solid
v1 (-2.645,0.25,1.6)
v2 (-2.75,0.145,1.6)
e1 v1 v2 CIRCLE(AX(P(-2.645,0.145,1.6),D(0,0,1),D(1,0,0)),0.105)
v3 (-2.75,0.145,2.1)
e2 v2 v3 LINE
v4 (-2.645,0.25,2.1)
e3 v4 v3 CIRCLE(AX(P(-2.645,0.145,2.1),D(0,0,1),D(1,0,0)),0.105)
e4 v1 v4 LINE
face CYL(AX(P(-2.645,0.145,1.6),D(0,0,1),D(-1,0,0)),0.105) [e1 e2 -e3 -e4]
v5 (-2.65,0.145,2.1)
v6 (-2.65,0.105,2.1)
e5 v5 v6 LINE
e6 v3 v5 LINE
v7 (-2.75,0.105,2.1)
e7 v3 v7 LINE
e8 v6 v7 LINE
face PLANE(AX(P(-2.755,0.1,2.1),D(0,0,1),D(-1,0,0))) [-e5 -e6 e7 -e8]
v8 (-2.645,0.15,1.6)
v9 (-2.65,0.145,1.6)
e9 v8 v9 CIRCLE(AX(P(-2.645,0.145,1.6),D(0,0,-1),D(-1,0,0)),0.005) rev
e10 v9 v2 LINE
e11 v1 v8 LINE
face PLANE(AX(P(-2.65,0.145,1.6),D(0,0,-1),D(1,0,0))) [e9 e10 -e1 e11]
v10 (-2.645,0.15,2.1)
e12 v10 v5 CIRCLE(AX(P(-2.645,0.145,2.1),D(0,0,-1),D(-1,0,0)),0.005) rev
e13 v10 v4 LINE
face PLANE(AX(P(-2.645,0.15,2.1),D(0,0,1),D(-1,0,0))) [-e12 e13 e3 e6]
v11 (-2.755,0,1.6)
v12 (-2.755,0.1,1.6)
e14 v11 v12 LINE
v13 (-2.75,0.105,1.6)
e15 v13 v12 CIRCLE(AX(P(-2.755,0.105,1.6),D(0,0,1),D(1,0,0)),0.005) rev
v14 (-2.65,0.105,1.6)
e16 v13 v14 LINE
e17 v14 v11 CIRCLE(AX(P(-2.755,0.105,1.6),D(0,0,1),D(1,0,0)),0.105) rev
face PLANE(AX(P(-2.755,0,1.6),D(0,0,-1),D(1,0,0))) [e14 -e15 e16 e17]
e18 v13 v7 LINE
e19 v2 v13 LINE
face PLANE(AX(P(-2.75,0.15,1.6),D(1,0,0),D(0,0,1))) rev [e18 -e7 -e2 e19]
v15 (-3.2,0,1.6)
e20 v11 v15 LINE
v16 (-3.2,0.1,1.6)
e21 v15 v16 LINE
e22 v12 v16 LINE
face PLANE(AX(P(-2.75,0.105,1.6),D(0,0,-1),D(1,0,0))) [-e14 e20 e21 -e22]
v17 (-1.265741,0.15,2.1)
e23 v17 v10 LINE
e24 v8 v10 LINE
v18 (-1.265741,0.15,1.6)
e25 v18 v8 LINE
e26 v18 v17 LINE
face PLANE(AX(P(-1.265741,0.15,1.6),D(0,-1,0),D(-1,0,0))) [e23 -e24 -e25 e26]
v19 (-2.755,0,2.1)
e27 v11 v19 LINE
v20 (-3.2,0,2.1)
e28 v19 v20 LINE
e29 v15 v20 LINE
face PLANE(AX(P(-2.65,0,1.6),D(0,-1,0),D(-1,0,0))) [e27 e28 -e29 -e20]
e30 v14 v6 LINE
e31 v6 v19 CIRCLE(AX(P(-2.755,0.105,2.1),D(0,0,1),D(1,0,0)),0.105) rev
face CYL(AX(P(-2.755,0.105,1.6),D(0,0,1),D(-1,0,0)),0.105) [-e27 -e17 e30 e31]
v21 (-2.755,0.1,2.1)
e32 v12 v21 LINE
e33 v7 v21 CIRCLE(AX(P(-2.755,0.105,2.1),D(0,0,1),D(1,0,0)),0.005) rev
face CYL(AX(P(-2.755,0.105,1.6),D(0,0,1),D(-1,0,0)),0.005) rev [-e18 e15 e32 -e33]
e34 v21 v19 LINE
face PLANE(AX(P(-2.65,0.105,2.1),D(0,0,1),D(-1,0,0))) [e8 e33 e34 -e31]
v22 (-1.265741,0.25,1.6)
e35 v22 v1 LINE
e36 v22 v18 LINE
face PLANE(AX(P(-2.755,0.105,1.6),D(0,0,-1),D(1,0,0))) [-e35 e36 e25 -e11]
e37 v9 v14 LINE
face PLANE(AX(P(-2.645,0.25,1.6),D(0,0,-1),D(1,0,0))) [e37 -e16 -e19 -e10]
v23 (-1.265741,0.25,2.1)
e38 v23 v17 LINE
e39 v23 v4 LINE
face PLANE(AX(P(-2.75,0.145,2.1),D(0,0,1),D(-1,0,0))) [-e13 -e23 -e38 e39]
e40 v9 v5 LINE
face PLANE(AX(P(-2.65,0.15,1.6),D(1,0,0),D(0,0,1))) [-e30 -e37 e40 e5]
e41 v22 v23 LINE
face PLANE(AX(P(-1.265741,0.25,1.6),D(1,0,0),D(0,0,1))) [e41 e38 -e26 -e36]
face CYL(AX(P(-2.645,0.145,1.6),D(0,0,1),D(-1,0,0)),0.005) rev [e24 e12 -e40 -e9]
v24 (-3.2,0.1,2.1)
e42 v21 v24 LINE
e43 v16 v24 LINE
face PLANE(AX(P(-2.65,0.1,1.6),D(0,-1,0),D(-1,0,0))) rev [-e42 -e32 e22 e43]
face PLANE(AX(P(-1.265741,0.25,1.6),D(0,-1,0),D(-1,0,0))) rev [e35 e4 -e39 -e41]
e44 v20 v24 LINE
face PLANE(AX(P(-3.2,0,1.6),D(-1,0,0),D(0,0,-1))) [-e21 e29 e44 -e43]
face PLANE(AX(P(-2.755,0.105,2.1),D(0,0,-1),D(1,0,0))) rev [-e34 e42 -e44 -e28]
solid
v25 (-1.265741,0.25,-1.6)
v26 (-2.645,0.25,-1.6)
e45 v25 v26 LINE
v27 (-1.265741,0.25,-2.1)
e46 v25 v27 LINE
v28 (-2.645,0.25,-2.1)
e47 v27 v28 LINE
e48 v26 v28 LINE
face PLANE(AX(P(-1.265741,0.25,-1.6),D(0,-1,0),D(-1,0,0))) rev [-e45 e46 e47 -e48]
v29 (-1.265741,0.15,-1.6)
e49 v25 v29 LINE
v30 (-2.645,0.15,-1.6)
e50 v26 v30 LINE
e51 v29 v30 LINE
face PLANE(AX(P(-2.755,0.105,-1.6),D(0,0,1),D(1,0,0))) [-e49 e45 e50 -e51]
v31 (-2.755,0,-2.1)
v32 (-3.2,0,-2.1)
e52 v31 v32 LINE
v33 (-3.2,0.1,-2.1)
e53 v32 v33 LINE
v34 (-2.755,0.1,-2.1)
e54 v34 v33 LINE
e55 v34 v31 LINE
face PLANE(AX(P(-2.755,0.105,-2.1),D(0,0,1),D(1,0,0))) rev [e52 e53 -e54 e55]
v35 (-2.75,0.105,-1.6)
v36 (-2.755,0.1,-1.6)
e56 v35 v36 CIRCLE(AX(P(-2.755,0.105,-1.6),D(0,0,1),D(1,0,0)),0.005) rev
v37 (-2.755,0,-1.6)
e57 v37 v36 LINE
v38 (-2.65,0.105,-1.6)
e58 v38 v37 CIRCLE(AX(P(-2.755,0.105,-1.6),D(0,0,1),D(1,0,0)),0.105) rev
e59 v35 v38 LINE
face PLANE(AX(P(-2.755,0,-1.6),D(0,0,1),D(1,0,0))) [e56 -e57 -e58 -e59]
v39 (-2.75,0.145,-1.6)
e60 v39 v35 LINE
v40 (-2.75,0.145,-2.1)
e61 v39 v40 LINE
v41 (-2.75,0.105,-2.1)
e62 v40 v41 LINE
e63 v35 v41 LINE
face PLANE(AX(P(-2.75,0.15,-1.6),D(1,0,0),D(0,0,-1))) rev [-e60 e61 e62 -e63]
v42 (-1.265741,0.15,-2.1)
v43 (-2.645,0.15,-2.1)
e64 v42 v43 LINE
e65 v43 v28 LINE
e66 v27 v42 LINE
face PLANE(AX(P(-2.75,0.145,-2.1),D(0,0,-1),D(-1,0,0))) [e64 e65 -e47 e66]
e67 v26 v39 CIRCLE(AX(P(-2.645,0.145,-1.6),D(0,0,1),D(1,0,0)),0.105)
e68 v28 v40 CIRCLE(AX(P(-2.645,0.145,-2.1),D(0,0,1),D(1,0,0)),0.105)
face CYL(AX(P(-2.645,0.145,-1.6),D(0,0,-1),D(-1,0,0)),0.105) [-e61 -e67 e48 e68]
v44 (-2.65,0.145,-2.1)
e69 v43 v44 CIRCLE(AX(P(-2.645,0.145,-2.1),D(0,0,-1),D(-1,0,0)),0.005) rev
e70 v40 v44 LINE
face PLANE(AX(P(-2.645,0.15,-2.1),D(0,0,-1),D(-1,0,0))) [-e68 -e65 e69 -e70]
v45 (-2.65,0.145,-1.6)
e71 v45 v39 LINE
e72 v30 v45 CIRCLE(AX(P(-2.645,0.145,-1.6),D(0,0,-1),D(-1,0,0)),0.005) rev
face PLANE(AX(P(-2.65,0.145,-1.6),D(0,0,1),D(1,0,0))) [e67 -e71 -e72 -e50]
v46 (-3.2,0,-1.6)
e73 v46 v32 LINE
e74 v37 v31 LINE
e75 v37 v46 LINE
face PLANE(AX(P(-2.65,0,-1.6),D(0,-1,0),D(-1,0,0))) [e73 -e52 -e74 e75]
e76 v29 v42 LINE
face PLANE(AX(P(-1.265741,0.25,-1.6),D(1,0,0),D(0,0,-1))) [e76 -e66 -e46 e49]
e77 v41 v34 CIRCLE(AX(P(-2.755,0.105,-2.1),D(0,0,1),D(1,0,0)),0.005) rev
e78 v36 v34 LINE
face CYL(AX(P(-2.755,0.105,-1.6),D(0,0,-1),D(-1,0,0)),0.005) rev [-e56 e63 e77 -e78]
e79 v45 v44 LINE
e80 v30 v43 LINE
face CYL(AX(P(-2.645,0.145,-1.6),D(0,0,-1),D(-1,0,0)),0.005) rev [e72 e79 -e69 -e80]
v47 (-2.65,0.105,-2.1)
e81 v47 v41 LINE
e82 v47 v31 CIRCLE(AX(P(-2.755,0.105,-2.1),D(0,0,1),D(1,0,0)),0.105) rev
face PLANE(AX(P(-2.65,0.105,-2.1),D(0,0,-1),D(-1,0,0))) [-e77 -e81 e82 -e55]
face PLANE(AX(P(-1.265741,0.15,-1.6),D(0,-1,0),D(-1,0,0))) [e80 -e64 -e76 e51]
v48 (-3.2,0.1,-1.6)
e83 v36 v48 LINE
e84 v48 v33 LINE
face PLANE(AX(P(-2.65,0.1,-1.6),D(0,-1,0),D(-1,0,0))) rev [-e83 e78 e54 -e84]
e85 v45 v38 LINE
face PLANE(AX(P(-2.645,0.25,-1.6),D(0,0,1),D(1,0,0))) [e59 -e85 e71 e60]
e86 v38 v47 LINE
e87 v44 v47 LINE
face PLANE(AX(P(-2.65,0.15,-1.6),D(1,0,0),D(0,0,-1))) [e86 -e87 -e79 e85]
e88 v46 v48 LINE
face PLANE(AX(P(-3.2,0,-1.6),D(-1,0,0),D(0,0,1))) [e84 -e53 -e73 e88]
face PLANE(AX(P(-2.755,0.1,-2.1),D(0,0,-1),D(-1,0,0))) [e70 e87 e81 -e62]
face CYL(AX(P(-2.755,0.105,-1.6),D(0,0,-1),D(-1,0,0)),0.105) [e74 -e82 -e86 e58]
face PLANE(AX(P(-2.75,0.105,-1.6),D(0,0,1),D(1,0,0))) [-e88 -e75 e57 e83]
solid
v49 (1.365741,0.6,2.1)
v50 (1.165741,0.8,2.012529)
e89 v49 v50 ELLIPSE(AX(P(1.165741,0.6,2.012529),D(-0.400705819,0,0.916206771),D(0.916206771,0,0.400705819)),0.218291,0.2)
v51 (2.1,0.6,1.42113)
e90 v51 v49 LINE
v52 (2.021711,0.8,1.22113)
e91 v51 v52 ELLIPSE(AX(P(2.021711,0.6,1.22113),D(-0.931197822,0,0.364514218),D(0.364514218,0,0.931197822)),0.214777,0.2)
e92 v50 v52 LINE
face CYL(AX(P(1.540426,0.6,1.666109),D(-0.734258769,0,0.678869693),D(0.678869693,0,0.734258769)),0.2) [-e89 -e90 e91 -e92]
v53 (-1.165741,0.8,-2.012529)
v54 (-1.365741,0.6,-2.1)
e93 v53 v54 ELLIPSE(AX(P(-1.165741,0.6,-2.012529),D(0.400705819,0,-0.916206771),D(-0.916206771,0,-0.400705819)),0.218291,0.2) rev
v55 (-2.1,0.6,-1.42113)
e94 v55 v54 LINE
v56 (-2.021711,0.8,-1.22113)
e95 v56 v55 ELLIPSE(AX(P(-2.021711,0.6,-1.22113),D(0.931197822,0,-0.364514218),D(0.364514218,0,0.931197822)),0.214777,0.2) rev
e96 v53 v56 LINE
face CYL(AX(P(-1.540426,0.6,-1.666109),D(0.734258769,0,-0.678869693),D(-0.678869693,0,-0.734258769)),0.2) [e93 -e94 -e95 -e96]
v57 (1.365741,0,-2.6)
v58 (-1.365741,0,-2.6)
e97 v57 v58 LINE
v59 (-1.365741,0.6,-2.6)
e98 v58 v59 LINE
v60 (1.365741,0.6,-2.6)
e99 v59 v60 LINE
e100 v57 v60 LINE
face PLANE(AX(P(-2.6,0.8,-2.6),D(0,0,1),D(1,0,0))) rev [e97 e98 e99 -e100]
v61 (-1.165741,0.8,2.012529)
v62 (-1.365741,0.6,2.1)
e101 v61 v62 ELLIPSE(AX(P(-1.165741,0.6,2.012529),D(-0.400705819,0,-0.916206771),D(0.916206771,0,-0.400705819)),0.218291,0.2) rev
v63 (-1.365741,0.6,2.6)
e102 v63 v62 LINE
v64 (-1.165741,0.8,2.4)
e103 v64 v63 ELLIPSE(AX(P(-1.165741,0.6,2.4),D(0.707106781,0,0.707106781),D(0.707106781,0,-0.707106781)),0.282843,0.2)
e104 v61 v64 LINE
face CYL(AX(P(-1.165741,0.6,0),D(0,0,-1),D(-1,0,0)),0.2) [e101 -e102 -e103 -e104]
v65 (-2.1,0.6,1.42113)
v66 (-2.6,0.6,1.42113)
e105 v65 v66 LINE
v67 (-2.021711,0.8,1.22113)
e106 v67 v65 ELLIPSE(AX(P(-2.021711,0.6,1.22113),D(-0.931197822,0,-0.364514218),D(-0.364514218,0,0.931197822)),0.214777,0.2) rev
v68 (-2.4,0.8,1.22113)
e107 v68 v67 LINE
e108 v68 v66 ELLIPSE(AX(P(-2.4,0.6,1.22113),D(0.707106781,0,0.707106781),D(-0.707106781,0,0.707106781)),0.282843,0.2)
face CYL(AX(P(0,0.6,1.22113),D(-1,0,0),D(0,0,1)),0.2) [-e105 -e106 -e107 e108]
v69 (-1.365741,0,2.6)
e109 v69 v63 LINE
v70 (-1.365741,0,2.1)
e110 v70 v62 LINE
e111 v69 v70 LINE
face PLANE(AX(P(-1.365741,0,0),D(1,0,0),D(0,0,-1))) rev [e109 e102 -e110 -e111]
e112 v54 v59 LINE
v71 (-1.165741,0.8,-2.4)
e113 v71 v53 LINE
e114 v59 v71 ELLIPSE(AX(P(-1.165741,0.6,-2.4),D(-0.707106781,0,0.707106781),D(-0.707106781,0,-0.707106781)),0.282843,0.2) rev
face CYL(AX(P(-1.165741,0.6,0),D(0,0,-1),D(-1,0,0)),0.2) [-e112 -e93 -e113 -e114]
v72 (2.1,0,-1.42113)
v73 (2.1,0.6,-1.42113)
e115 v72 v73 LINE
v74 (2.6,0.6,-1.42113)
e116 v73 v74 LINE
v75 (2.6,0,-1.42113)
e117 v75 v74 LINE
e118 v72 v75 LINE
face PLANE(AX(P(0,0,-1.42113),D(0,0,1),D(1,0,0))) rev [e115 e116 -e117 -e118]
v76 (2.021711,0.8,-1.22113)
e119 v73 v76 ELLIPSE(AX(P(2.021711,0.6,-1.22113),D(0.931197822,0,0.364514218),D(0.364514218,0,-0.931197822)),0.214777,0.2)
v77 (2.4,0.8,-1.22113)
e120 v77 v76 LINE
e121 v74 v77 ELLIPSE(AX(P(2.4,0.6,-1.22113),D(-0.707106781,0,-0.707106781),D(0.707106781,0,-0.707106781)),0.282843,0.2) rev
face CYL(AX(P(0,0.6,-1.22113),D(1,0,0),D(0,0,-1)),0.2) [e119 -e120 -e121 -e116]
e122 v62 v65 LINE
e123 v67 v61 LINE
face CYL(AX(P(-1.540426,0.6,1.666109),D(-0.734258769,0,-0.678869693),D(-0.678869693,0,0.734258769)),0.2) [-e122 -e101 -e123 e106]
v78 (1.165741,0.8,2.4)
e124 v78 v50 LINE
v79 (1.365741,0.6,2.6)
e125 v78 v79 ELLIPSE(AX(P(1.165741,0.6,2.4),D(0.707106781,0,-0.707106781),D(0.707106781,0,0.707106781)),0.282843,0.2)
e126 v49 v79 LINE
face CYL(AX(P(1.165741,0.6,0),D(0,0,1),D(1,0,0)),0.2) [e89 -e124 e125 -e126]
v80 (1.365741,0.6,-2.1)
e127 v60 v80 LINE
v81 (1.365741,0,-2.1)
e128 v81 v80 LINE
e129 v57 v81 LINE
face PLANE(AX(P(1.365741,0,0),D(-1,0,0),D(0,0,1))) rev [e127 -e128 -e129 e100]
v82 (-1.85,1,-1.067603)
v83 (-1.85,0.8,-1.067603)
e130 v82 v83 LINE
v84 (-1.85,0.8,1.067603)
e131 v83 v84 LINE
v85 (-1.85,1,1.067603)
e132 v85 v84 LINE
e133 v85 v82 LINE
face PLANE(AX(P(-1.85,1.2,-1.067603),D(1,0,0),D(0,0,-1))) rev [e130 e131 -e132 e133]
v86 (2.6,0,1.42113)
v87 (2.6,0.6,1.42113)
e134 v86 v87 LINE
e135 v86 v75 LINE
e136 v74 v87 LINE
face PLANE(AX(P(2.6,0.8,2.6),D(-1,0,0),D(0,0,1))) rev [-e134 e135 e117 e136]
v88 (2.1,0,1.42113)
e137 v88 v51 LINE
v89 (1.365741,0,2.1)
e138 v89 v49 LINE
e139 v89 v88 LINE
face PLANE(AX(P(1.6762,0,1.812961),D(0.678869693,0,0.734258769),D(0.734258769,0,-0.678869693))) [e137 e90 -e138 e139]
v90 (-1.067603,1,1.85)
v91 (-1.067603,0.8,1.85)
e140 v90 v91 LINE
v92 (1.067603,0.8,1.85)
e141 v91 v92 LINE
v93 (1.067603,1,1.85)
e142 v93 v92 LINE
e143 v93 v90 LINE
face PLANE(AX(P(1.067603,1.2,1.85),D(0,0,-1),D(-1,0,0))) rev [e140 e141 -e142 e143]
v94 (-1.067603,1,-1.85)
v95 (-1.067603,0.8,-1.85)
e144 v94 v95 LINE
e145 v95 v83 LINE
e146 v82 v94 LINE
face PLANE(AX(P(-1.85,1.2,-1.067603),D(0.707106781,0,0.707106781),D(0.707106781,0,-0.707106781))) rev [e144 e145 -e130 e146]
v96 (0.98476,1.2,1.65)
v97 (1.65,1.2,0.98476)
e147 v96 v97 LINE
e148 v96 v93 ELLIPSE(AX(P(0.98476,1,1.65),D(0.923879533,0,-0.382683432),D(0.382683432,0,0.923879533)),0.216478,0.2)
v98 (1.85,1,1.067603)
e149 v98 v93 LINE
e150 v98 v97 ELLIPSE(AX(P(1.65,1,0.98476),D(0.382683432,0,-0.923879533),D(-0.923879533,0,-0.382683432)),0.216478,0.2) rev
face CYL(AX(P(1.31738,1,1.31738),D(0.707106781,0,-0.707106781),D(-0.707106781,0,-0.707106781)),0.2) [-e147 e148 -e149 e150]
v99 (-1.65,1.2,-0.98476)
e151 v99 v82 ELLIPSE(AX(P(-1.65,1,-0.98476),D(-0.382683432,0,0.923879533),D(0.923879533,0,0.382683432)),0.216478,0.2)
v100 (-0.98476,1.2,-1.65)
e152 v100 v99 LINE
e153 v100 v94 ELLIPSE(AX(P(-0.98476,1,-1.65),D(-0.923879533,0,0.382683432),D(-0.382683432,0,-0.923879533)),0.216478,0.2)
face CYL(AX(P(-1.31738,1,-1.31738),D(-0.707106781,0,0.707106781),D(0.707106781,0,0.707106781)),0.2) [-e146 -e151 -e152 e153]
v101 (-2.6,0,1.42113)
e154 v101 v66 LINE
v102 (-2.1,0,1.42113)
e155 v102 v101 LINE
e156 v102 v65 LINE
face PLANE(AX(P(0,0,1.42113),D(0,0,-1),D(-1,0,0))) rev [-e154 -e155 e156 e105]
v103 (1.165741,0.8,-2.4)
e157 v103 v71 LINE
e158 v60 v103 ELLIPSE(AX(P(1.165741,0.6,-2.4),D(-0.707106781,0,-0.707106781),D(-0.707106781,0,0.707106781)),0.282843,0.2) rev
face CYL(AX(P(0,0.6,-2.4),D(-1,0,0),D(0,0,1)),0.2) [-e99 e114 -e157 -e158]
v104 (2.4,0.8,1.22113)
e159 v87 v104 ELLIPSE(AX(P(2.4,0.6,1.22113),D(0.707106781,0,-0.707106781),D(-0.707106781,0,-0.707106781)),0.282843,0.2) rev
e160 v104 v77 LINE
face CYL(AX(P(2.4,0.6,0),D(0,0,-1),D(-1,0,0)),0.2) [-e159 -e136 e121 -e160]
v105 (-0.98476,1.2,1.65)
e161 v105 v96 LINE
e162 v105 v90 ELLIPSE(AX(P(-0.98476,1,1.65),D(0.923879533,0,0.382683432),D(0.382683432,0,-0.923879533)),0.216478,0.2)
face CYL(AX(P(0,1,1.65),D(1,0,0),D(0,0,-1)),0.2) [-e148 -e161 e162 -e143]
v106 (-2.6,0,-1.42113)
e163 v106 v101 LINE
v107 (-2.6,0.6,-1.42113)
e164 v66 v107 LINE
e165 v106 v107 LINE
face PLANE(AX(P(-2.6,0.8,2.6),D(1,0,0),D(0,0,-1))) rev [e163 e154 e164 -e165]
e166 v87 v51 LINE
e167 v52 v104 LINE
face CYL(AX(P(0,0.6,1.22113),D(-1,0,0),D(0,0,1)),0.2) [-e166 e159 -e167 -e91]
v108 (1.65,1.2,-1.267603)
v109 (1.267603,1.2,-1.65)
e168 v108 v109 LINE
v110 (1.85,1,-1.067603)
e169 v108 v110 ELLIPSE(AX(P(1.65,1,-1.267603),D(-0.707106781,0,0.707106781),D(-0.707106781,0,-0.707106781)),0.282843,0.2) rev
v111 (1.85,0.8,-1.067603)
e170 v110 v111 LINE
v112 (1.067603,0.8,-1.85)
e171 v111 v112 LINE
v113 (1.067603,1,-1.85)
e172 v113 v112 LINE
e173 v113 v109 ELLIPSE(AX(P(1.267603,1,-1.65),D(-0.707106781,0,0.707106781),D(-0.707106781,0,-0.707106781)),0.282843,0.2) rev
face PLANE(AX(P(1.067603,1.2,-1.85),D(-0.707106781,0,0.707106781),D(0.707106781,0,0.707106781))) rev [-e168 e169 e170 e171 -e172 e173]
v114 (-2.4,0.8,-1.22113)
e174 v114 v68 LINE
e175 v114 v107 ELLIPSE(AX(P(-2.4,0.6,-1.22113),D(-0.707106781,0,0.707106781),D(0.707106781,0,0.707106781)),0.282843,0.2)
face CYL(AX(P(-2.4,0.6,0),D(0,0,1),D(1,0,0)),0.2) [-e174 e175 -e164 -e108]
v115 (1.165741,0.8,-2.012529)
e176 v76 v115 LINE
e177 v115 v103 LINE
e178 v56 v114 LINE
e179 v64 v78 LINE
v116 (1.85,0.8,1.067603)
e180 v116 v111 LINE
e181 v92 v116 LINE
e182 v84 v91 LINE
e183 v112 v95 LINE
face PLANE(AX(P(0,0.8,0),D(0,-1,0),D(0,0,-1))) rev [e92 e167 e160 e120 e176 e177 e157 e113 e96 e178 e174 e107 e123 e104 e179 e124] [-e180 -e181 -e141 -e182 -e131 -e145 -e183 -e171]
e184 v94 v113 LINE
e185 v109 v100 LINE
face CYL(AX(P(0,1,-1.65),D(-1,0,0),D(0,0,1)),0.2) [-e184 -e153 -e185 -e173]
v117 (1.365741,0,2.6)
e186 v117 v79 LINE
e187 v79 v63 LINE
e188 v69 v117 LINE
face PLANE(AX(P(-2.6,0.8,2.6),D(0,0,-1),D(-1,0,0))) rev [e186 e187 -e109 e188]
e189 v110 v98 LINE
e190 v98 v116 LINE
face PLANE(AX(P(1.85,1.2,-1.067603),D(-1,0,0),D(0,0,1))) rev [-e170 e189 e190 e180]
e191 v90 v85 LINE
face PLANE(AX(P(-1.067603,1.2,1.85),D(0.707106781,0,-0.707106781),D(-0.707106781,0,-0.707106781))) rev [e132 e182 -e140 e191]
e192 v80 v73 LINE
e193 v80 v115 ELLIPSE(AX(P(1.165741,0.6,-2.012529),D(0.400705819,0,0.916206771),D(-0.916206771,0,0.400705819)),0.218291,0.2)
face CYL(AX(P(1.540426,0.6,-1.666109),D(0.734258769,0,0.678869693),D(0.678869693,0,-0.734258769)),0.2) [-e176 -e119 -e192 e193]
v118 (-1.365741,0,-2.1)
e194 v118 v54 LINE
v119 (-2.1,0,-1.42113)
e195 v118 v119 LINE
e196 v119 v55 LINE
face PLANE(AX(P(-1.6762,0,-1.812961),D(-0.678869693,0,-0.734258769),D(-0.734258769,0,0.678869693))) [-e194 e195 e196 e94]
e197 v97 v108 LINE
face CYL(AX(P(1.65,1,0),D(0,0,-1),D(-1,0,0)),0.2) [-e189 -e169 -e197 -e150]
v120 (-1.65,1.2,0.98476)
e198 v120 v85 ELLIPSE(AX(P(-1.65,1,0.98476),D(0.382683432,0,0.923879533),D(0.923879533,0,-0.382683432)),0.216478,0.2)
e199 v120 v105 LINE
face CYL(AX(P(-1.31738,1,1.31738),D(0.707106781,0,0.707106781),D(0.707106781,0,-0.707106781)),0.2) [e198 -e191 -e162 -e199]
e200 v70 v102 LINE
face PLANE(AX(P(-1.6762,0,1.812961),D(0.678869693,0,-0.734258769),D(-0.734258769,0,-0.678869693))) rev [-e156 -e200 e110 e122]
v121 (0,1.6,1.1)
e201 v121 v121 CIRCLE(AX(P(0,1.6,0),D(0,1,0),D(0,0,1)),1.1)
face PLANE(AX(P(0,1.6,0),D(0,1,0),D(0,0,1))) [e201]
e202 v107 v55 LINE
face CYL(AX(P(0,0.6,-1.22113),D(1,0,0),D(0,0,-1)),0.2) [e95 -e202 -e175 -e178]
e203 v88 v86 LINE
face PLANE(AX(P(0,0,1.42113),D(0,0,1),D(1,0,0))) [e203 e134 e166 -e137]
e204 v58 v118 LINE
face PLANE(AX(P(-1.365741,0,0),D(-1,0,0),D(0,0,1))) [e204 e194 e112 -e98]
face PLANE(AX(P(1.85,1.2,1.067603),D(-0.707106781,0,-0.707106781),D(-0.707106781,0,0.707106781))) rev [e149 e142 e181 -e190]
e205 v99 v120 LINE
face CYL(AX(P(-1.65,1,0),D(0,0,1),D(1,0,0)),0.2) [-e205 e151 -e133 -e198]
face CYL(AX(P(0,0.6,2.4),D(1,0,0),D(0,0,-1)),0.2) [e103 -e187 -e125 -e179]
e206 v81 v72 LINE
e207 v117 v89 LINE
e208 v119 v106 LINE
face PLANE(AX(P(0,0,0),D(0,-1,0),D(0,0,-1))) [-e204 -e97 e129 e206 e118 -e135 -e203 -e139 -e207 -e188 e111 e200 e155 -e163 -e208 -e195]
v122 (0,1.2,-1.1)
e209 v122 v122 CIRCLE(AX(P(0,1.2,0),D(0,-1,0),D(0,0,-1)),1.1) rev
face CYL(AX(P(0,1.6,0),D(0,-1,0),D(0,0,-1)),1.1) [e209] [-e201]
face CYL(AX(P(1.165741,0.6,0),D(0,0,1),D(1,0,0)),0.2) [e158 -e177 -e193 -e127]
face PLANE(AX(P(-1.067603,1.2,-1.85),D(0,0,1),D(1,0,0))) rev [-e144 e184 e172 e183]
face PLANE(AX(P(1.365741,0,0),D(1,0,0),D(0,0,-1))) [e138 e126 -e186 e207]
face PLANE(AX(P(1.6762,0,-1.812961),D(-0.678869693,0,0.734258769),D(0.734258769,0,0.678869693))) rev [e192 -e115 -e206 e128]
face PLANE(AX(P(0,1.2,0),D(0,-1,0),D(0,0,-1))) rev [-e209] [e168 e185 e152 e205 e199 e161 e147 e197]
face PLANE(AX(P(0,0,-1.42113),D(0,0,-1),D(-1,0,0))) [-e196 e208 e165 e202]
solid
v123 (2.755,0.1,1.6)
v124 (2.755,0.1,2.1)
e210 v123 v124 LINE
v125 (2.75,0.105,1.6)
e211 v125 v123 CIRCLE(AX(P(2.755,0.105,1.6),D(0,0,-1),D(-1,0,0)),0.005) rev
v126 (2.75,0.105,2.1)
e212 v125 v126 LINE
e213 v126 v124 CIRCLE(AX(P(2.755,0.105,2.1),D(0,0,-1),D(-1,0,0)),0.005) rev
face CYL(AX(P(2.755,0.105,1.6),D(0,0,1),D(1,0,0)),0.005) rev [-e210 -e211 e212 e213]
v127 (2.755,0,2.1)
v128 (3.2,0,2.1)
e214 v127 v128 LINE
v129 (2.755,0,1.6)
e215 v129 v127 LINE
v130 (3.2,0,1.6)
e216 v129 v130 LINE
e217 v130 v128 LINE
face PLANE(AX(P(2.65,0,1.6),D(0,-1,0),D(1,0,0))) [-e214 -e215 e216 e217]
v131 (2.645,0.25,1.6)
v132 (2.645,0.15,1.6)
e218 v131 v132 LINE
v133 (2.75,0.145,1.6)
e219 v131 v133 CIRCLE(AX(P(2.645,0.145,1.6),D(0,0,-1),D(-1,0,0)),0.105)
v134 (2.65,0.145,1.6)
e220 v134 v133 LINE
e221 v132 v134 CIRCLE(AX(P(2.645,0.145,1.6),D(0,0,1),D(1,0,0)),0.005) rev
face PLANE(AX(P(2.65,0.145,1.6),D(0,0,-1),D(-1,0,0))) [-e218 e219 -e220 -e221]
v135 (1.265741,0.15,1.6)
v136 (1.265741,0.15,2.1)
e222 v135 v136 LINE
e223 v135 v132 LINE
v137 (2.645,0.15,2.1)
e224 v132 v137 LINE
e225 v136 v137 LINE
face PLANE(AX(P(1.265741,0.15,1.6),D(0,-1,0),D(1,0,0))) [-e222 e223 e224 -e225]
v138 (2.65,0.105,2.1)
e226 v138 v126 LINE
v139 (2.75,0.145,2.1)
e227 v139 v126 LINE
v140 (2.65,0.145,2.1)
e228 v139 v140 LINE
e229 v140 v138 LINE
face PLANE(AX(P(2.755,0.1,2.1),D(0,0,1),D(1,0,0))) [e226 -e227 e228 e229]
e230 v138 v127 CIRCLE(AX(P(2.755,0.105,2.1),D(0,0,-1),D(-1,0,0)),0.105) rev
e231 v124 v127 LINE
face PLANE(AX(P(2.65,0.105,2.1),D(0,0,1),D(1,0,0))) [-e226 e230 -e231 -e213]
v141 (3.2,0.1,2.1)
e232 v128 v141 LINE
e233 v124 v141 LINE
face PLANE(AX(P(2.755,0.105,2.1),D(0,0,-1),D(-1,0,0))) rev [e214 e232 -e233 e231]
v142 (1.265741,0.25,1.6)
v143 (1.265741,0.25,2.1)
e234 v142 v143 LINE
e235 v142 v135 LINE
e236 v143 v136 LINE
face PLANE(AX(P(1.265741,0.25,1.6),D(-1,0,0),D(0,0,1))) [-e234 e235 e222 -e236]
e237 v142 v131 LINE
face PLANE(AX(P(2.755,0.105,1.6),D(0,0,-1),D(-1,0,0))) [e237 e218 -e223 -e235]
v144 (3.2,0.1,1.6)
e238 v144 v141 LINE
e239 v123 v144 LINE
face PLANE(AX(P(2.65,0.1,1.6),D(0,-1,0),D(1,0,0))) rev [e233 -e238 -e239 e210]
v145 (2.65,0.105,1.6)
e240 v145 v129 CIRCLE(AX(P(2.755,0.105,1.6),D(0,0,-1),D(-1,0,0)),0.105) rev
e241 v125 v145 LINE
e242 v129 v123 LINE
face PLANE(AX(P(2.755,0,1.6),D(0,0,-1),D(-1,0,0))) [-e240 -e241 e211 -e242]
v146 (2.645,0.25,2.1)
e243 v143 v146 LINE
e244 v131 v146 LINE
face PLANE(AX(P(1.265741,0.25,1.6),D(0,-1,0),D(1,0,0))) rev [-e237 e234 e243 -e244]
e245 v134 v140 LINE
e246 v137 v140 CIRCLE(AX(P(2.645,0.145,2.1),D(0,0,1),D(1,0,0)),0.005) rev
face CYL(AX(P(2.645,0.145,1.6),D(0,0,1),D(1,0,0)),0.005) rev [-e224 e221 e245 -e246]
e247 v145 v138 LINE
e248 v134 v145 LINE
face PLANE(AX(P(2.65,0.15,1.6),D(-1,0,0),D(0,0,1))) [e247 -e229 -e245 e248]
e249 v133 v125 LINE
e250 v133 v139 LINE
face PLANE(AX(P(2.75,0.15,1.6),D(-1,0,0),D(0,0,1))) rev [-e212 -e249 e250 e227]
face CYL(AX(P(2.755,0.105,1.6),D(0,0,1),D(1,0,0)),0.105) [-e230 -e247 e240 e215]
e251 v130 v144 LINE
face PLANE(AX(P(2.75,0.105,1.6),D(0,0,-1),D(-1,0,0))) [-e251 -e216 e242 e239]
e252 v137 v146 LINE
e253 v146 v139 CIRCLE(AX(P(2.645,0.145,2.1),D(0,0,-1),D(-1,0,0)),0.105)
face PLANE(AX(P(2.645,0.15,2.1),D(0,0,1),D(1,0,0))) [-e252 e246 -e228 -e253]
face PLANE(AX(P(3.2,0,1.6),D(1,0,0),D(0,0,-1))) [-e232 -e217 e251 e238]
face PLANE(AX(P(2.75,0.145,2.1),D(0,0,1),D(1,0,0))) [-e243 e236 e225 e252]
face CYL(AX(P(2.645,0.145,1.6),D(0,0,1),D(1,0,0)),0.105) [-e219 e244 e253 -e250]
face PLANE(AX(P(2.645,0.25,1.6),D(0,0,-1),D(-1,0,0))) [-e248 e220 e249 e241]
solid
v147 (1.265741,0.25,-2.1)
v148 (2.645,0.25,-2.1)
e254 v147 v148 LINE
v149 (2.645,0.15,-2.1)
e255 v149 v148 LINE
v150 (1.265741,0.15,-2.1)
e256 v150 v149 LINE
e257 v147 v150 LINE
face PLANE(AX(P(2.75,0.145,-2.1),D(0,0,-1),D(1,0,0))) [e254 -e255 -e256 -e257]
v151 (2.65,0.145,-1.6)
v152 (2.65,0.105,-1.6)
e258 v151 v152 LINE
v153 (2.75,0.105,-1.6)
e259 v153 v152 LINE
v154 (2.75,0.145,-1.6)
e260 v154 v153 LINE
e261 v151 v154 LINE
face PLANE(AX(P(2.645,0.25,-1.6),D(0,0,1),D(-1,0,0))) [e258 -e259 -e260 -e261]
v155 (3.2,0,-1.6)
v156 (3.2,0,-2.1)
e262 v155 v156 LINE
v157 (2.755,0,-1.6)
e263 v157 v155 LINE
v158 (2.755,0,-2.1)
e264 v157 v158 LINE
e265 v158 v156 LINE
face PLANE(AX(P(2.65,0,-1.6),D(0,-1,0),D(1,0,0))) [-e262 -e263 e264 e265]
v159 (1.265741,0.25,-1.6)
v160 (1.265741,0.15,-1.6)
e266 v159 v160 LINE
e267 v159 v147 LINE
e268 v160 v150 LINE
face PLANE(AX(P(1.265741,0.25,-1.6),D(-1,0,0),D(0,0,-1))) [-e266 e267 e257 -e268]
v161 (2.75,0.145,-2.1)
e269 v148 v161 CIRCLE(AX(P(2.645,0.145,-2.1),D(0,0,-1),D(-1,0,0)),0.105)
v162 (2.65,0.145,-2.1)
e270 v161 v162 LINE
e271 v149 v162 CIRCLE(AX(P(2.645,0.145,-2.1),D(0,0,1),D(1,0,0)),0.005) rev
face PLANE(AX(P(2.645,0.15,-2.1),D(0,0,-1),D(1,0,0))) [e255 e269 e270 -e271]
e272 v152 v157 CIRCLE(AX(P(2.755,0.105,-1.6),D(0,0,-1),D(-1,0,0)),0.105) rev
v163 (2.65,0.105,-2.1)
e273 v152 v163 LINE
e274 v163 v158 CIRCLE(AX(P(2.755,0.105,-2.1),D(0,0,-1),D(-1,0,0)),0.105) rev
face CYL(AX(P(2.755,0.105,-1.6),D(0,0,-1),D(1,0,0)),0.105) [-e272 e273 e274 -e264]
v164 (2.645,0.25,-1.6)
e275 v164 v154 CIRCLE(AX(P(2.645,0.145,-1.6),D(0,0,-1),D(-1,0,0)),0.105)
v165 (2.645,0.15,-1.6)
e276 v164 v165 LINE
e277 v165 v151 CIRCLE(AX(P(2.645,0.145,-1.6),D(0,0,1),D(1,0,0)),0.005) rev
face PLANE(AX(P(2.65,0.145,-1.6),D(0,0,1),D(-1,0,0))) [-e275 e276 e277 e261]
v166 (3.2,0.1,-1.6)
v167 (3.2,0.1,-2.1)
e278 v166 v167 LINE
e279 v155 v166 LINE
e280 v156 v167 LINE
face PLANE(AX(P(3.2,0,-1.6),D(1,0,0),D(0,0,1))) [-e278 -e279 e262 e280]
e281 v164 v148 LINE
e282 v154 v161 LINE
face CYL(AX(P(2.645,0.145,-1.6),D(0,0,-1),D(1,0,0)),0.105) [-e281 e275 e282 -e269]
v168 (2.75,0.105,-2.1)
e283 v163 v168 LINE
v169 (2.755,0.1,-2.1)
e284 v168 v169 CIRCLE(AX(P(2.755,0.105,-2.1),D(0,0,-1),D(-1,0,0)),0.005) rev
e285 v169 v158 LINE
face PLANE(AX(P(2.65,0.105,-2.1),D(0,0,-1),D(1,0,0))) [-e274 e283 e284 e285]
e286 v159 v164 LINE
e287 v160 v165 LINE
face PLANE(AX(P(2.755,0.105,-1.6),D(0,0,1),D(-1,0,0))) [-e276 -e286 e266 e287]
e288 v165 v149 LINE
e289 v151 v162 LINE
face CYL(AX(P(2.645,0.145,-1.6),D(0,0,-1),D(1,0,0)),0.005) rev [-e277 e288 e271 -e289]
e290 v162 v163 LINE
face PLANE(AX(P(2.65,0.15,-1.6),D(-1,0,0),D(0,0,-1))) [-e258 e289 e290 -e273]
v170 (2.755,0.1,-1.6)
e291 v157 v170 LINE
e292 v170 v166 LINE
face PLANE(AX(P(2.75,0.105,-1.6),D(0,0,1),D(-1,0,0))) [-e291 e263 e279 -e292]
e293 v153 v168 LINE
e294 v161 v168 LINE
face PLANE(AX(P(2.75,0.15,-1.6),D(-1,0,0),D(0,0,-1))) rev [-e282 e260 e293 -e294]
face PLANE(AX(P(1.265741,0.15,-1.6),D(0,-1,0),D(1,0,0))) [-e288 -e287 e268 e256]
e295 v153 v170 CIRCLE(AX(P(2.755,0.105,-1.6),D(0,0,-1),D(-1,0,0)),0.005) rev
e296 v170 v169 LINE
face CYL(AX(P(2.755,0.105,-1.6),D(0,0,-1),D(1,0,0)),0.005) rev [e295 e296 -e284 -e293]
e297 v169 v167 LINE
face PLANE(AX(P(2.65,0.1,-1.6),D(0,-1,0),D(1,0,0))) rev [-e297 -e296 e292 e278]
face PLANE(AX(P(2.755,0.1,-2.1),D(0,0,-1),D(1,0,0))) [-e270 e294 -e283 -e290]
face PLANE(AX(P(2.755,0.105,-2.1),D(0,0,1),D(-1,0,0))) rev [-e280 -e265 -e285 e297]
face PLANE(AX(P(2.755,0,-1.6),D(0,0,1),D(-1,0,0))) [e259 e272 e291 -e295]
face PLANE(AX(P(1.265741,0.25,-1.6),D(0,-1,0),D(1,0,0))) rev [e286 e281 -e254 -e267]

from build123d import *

# Parameters (mm, degrees)
SKETCH1_W               = 5.2
SKETCH1_H               = 5.2
BOSS_EXTRUDE1_DEPTH     = 0.8
BOSS_EXTRUDE2_DEPTH     = 0.4
SKETCH3_R               = 1.1
BOSS_EXTRUDE3_DEPTH     = 0.4
CUT_EXTRUDE1_DEPTH      = 4.762977544
BASE_FLANGE1_DEPTH      = 0.25
BASE_FLANGE1_DEPTH_BACK = 0.25
FILLET1_R               = 0.2
FILLET2_R               = 0.2


# Sheet-metal steps are written as plain solids
with BuildPart() as part:
    # Sketch1 → Boss-Extrude1 (new body)
    with BuildSketch(Plane(origin=(0, 0, 0), x_dir=(1, 0, 0), z_dir=(0, 1, 0))):
        Rectangle(SKETCH1_W, SKETCH1_H)
    extrude(amount=BOSS_EXTRUDE1_DEPTH)

    # Sketch2 → Boss-Extrude2 (add)
    with BuildSketch(Plane(origin=(0, 0.8, 0), x_dir=(1, 0, 0), z_dir=(0, 1, 0))):
        Polygon((-1.067602847, 1.85), (1.067602847, 1.85), (1.85, 1.067602847), (1.85, -1.067602847), (1.067602847, -1.85), (-1.067602847, -1.85), (-1.85, -1.067602847), (-1.85, 1.067602847), align=None)
    extrude(amount=BOSS_EXTRUDE2_DEPTH)

    # Sketch3 → Boss-Extrude3 (add)
    with BuildSketch(Plane(origin=(0, 1.2, 0), x_dir=(1, 0, 0), z_dir=(0, 1, 0))):
        with Locations(Location((0, 0, 0), (0, 0, 90))):
            Circle(SKETCH3_R)
    extrude(amount=BOSS_EXTRUDE3_DEPTH)

    # Sketch4 → Cut-Extrude1 (cut, through all)
    with BuildSketch(Plane(origin=(0, 0.8, 0), x_dir=(1, 0, 0), z_dir=(0, 1, 0))):
        Polygon((2.6, 2.6), (1.365741231, 2.6), (1.365741231, 2.1), (2.1, 1.421130307), (2.6, 1.421130307), align=None)
        Polygon((-1.365741231, 2.1), (-1.365741231, 2.6), (-2.6, 2.6), (-2.6, 1.421130307), (-2.1, 1.421130307), align=None)
        Polygon((-2.1, -1.421130307), (-2.6, -1.421130307), (-2.6, -2.6), (-1.365741231, -2.6), (-1.365741231, -2.1), align=None)
        Polygon((2.6, -2.6), (2.6, -1.421130307), (2.1, -1.421130307), (1.365741231, -2.1), (1.365741231, -2.6), align=None)
    extrude(amount=-CUT_EXTRUDE1_DEPTH, mode=Mode.SUBTRACT)

    # Fillet1
    fillet1_edges = [part.edges().sort_by_distance(p)[0] for p in [
        (-1.458801424, 1.2, -1.458801424),
        (-1.85, 1.2, 0),
        (-1.458801424, 1.2, 1.458801424),
        (0, 1.2, 1.85),
        (1.458801424, 1.2, 1.458801424),
        (1.85, 1.2, 0),
        (0, 1.2, -1.85),
    ]]
    fillet(fillet1_edges, radius=FILLET1_R)

    # Fillet2
    fillet2_edges = [part.edges().sort_by_distance(p)[0] for p in [
        (0, 0.8, -2.6),
        (1.365741231, 0.8, -2.35),
        (1.732870615, 0.8, -1.760565154),
        (2.35, 0.8, -1.421130307),
        (-2.6, 0.8, 0),
        (-2.35, 0.8, -1.421130307),
        (-1.365741231, 0.8, -2.35),
        (-1.732870615, 0.8, -1.760565154),
        (0, 0.8, 2.6),
        (-1.365741231, 0.8, 2.35),
        (-1.732870615, 0.8, 1.760565154),
        (-2.35, 0.8, 1.421130307),
        (2.6, 0.8, 0),
        (2.35, 0.8, 1.421130307),
        (1.365741231, 0.8, 2.35),
        (1.732870615, 0.8, 1.760565154),
    ]]
    fillet(fillet2_edges, radius=FILLET2_R)


with BuildPart() as body_2:
    # Sketch5 → Base-Flange1 (new, two sides: drawn at the far end of the back side and taken through both)
    with BuildSketch(Plane(origin=(0, 0, 1.85), x_dir=(-1, 0, 0), z_dir=(0, 0, -1)).offset(-BASE_FLANGE1_DEPTH_BACK)):
        with BuildLine():
            Line((-1.265741231, 0.15), (-2.645, 0.15))
            ThreePointArc((-2.645, 0.15), (-2.648535534, 0.148535534), (-2.65, 0.145))
            Line((-2.65, 0.145), (-2.65, 0.105))
            ThreePointArc((-2.65, 0.105), (-2.680753788, 0.030753788), (-2.755, 0))
            Line((-2.755, 0), (-3.2, 0))
            Line((-3.2, 0), (-3.2, 0.1))
            Line((-3.2, 0.1), (-2.755, 0.1))
            ThreePointArc((-2.755, 0.1), (-2.751464466, 0.101464466), (-2.75, 0.105))
            Line((-2.75, 0.105), (-2.75, 0.145))
            ThreePointArc((-2.75, 0.145), (-2.719246212, 0.219246212), (-2.645, 0.25))
            Line((-2.645, 0.25), (-1.265741231, 0.25))
            Line((-1.265741231, 0.25), (-1.265741231, 0.15))
        make_face()
    extrude(amount=BASE_FLANGE1_DEPTH + BASE_FLANGE1_DEPTH_BACK)


with BuildPart() as body_3:
    # Mirror1: mirrored copy
    add(body_2.part.mirror(Plane.ZY))


with BuildPart() as body_4:
    # Mirror2: mirrored copy
    add(body_3.part.mirror(Plane(origin=(0, 0, 0), x_dir=(1, 0, 0), z_dir=(0, 0, -1))))


with BuildPart() as body_5:
    # Mirror2 2: mirrored copy
    add(body_2.part.mirror(Plane(origin=(0, 0, 0), x_dir=(1, 0, 0), z_dir=(0, 0, -1))))


solid = Compound([part.part, body_2.part, body_3.part, body_4.part, body_5.part])
